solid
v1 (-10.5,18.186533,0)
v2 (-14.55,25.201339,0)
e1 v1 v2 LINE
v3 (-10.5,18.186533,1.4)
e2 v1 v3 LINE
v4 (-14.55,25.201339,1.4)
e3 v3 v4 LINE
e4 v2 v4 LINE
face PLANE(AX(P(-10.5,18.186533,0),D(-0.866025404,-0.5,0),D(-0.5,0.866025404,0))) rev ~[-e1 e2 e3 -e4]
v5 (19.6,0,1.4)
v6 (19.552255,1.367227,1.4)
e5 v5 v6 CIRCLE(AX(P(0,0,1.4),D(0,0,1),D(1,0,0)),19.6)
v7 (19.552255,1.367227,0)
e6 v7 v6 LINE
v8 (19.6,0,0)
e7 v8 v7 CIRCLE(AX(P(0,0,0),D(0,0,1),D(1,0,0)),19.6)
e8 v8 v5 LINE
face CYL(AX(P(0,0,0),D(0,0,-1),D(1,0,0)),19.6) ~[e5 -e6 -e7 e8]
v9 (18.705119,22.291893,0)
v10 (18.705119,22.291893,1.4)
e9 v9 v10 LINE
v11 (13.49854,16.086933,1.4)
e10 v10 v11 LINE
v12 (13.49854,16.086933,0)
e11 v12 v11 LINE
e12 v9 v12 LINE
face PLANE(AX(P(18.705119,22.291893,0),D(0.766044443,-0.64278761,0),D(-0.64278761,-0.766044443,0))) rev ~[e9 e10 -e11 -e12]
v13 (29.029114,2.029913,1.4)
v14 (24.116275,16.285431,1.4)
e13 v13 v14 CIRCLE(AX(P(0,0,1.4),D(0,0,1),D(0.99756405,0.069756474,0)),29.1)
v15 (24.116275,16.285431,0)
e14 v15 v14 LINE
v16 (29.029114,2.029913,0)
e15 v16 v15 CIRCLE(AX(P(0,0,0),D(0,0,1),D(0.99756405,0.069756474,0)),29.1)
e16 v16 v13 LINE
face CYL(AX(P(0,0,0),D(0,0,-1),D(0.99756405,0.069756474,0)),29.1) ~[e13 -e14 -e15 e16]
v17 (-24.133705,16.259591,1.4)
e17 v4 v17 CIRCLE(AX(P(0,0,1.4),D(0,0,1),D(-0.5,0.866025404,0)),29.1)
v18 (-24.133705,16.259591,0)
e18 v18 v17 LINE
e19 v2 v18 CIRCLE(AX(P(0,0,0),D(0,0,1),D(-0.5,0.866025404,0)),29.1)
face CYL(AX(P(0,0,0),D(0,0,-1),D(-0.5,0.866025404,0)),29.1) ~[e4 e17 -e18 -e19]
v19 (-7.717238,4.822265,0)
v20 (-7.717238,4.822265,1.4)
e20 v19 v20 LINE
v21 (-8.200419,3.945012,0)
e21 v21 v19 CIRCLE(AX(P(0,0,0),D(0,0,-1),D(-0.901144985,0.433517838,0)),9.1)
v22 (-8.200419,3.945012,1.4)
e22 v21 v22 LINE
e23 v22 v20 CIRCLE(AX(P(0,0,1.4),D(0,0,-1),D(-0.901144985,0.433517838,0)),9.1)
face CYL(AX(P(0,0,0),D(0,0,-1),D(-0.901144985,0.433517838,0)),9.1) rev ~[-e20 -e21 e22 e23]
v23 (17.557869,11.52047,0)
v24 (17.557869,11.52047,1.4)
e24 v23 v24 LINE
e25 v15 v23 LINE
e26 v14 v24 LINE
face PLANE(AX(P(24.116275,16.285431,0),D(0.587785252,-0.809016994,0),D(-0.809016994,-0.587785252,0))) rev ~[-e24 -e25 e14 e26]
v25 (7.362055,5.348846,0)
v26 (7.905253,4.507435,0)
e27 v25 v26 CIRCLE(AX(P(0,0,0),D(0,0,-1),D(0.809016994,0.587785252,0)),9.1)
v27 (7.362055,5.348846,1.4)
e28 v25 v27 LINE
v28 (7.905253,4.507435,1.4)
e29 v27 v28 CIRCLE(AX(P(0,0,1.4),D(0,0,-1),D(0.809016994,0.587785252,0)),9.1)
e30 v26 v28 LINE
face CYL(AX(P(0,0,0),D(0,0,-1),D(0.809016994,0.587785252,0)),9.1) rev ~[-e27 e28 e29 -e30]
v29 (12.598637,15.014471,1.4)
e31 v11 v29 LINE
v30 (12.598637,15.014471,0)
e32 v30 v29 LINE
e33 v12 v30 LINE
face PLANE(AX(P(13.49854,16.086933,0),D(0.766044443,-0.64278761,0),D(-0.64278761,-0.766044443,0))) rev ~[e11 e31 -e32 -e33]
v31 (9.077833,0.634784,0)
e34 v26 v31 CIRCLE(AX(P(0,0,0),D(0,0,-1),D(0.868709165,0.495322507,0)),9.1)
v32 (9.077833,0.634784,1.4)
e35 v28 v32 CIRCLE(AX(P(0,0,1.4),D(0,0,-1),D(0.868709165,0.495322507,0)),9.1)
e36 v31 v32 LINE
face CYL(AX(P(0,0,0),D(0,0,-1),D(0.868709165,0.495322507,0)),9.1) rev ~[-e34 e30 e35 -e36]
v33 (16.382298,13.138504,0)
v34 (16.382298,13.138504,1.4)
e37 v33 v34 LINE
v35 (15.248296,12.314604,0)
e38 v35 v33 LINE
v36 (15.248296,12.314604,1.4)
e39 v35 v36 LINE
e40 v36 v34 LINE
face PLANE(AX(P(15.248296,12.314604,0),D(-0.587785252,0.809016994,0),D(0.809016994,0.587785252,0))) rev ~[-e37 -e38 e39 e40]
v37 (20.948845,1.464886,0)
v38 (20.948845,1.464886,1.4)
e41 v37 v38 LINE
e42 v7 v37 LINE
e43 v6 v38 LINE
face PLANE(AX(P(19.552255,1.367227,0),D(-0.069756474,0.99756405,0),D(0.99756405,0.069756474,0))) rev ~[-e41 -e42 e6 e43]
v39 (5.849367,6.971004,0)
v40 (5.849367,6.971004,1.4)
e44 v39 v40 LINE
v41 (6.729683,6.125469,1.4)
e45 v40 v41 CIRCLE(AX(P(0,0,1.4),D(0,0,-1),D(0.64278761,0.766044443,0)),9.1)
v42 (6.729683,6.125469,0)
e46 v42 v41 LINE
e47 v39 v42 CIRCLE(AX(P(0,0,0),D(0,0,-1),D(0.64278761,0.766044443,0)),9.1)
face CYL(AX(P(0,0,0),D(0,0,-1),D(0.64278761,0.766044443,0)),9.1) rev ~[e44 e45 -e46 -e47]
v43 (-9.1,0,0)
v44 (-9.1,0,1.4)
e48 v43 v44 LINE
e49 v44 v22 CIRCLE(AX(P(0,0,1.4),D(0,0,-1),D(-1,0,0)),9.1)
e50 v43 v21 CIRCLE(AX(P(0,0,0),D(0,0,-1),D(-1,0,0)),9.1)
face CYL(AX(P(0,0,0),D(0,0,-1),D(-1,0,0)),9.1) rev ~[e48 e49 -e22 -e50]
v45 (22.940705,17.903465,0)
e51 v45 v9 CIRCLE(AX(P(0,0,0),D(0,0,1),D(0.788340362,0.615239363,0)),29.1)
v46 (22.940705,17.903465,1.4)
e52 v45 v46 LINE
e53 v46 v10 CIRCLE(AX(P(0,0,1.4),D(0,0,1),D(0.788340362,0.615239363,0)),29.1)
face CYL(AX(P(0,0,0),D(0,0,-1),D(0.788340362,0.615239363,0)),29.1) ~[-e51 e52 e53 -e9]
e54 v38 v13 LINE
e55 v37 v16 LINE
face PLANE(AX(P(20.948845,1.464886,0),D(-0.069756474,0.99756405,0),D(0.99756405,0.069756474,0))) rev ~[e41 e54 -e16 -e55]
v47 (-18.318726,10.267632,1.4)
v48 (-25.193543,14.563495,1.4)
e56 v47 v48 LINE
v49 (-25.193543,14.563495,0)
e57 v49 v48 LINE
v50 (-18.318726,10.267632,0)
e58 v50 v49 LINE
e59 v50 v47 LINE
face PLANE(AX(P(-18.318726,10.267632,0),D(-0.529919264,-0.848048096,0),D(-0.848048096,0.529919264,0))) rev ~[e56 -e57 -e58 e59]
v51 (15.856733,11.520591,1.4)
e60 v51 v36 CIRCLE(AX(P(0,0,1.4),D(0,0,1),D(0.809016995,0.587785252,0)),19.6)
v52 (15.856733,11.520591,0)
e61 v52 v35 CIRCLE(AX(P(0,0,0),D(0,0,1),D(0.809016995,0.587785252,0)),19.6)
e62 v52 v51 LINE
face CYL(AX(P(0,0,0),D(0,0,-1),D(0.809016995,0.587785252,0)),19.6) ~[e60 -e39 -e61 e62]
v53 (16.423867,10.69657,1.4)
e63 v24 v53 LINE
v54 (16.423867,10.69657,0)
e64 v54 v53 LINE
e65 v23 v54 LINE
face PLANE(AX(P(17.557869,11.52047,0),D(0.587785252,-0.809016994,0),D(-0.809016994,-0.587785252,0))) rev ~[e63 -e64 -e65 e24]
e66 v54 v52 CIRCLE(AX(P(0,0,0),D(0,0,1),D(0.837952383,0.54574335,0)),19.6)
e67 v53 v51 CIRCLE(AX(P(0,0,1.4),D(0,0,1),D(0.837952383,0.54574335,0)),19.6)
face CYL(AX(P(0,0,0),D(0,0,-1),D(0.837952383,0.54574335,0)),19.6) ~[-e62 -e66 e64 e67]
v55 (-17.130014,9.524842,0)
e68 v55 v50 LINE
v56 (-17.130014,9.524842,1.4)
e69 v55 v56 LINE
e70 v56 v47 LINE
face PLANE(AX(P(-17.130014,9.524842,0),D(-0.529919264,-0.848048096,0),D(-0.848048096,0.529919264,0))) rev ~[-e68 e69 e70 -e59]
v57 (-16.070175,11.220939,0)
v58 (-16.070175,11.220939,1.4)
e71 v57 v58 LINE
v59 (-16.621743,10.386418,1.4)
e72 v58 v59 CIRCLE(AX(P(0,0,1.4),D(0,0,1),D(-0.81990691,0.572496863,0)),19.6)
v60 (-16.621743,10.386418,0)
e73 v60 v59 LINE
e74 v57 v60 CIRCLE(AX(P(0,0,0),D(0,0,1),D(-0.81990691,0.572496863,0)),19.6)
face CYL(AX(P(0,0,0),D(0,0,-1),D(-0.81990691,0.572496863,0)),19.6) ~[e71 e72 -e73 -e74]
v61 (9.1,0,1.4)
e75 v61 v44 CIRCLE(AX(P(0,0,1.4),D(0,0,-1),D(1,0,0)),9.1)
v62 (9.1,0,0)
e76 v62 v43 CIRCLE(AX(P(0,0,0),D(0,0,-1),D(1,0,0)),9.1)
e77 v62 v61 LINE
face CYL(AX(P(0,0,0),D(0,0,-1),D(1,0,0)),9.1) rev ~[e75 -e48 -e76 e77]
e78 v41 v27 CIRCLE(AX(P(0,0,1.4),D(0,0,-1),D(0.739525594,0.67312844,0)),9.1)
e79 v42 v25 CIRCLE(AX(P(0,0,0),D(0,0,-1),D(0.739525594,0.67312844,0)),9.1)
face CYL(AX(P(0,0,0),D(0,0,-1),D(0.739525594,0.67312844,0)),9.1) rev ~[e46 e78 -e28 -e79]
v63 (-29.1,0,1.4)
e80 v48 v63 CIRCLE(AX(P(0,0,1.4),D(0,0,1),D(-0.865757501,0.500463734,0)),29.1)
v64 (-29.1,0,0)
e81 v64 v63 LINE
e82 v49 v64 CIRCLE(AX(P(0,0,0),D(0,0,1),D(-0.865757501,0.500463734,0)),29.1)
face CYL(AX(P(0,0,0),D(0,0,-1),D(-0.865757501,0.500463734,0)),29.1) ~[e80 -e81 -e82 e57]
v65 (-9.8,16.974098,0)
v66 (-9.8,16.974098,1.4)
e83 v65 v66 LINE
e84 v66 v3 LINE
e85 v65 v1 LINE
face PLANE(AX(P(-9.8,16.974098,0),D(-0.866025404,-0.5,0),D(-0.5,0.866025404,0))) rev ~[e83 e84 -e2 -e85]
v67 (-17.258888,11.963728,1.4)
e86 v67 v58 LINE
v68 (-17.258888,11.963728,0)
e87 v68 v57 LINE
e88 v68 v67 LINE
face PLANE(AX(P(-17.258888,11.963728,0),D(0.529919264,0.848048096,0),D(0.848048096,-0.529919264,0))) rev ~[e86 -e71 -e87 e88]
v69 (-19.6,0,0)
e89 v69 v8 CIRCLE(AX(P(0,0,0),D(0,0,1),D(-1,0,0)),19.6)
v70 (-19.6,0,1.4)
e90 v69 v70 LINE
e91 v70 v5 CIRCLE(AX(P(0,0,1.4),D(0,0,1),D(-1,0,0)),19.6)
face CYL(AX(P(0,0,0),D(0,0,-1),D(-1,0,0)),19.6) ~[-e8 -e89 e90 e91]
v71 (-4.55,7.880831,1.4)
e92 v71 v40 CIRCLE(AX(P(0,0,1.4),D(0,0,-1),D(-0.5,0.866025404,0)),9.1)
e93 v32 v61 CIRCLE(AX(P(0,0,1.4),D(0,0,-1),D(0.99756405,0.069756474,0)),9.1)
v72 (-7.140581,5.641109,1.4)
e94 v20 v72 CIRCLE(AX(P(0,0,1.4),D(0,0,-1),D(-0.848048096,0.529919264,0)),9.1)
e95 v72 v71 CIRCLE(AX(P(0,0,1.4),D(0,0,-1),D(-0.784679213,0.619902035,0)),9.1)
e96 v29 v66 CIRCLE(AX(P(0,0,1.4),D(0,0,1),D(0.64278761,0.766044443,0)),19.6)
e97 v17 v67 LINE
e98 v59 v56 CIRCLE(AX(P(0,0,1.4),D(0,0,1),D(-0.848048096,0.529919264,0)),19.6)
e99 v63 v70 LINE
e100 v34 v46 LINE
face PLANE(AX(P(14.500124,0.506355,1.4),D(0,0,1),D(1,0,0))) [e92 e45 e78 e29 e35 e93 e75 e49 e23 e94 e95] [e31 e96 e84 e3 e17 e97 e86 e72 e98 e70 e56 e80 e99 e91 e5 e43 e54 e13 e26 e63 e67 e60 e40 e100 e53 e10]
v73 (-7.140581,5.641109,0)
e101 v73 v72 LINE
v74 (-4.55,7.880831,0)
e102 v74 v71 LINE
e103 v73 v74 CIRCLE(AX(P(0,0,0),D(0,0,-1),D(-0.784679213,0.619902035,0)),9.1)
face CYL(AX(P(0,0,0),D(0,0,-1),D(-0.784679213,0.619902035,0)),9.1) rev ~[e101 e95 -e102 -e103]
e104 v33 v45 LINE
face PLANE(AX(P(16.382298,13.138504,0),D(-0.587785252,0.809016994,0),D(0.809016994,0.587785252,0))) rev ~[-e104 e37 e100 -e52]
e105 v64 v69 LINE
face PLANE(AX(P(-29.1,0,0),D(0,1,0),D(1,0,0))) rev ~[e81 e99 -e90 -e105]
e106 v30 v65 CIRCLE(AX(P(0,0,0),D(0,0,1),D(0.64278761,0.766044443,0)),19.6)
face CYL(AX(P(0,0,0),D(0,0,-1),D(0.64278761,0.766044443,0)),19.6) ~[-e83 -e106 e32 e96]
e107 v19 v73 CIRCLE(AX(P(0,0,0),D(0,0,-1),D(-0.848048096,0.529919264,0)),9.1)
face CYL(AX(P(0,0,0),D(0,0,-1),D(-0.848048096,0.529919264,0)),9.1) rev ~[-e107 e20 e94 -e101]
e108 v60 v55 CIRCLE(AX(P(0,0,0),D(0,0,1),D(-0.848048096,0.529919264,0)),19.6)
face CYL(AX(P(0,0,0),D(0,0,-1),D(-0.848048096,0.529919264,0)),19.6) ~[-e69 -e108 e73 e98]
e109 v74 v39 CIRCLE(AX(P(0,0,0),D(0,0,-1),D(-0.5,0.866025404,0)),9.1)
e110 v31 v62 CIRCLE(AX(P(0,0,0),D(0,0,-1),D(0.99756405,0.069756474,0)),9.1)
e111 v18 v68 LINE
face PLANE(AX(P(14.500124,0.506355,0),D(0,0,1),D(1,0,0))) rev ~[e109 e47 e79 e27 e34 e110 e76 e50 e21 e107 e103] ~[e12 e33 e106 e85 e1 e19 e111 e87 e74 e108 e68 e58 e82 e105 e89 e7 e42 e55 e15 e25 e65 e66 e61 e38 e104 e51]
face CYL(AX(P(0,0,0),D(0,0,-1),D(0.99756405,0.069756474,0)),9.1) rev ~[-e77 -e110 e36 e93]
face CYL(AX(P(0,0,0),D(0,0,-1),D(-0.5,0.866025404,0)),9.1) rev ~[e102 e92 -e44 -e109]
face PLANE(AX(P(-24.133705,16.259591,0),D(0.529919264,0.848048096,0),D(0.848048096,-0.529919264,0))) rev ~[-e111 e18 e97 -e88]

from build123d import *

# Parameters (mm, degrees)
F1_DEPTH = 1.4


# Not quite as in the source:
# - a feature names something its author has since deleted; it is built from what else it names


with BuildPart() as f1:
    # F0 (on Top) → F1 (new body)
    with BuildSketch(Plane.XY):
        with BuildLine():
            Line((9.1, 0), (19.6, 0))
            ThreePointArc((19.6, 0), (19.5880602096, 0.6840301354), (19.5522553851, 1.3672268854))
            Line((19.5522553851, 1.3672268854), (9.0778328574, 0.6347839111))
            ThreePointArc((9.0778328574, 0.6347839111), (9.0944565259, 0.31758542), (9.1, 0))
        make_face()
        with BuildLine():
            ThreePointArc((-19.6, 0), (0, -19.6), (19.6, 0))
            Line((19.6, 0), (9.1, 0))
            ThreePointArc((9.1, 0), (0, -9.1), (-9.1, 0))
            Line((-9.1, 0), (-19.6, 0))
        make_face()
        with BuildLine():
            Line((9.0778328574, 0.6347839111), (19.5522553851, 1.3672268854))
            ThreePointArc((19.5522553851, 1.3672268854), (18.5830433274, 6.2314124156), (16.4238667052, 10.6965696581))
            Line((16.4238667052, 10.6965696581), (7.9052534042, 4.5074348153))
            ThreePointArc((7.9052534042, 4.5074348153), (8.7095155433, 2.6371080753), (9.0778328574, 0.6347839111))
        make_face()
        with BuildLine():
            ThreePointArc((16.4238667052, 10.6965696581), (18.5830433274, 6.2314124156), (19.5522553851, 1.3672268854))
            Line((19.5522553851, 1.3672268854), (20.9488450555, 1.4648859486))
            ThreePointArc((20.9488450555, 1.4648859486), (19.8990062518, 6.7104061122), (17.5578688927, 11.5204704742))
            Line((17.5578688927, 11.5204704742), (16.4238667052, 10.6965696581))
        make_face()
        with BuildLine():
            Line((-21, 0), (-19.6, 0))
            ThreePointArc((-19.6, 0), (-18.9724573243, 4.9199454342), (-17.1300139719, 9.5248423254))
            Line((-17.1300139719, 9.5248423254), (-18.3187262027, 10.2676321667))
            ThreePointArc((-18.3187262027, 10.2676321667), (-20.3186275405, 5.3059753931), (-21, 0))
        make_face()
        with BuildLine():
            ThreePointArc((-17.1300139719, 9.5248423254), (-18.9724573243, 4.9199454342), (-19.6, 0))
            Line((-19.6, 0), (-9.1, 0))
            ThreePointArc((-9.1, 0), (-8.8722549614, 2.0231391203), (-8.2004193626, 3.9450123291))
            Line((-8.2004193626, 3.9450123291), (-17.1300139719, 9.5248423254))
        make_face()
        with BuildLine():
            Line((7.9052534042, 4.5074348153), (16.4238667052, 10.6965696581))
            ThreePointArc((16.4238667052, 10.6965696581), (16.1455577033, 11.1121989925), (15.8567330897, 11.5205909449))
            Line((15.8567330897, 11.5205909449), (7.3620546488, 5.3488457959))
            ThreePointArc((7.3620546488, 5.3488457959), (7.6452381851, 4.9356188157), (7.9052534042, 4.5074348153))
        make_face()
        with BuildLine():
            ThreePointArc((17.5578688927, 11.5204704742), (19.8990062518, 6.7104061122), (20.9488450555, 1.4648859486))
            Line((20.9488450555, 1.4648859486), (29.0291138626, 2.029913386))
            ThreePointArc((29.0291138626, 2.029913386), (27.512052622, 9.481400768), (24.1162750467, 16.285431461))
            Line((24.1162750467, 16.285431461), (17.5578688927, 11.5204704742))
        make_face()
        with BuildLine():
            ThreePointArc((-16.6217426847, 10.386417579), (-16.8813757535, 9.9588730623), (-17.1300139719, 9.5248423254))
            Line((-17.1300139719, 9.5248423254), (-8.2004193626, 3.9450123291))
            ThreePointArc((-8.2004193626, 3.9450123291), (-7.9709061334, 4.3902910396), (-7.717237675, 4.8222653045))
            Line((-7.717237675, 4.8222653045), (-16.6217426847, 10.386417579))
        make_face()
        with BuildLine():
            Line((-29.1, 0), (-21, 0))
            ThreePointArc((-21, 0), (-20.3186275405, 5.3059753931), (-18.3187262027, 10.2676321667))
            Line((-18.3187262027, 10.2676321667), (-25.1935432849, 14.5634946614))
            ThreePointArc((-25.1935432849, 14.5634946614), (-28.1064237283, 7.5391607759), (-29.1, 0))
        make_face()
        with BuildLine():
            Line((7.3620546488, 5.3488457959), (15.8567330897, 11.5205909449))
            ThreePointArc((15.8567330897, 11.5205909449), (15.5575809762, 11.9214795294), (15.2482962006, 12.3146036469))
            Line((15.2482962006, 12.3146036469), (6.7296828997, 6.1254688041))
            ThreePointArc((6.7296828997, 6.1254688041), (7.0565609618, 5.7458635027), (7.3620546488, 5.3488457959))
        make_face()
        with BuildLine():
            ThreePointArc((-16.0701754434, 11.2209385177), (-16.3512838646, 10.8071974155), (-16.6217426847, 10.386417579))
            Line((-16.6217426847, 10.386417579), (-7.717237675, 4.8222653045))
            ThreePointArc((-7.717237675, 4.8222653045), (-7.4401827106, 5.2396260586), (-7.1405808342, 5.6411085215))
            Line((-7.1405808342, 5.6411085215), (-16.0701754434, 11.2209385177))
        make_face()
        with BuildLine():
            Line((6.7296828997, 6.1254688041), (15.2482962006, 12.3146036469))
            ThreePointArc((15.2482962006, 12.3146036469), (13.9887542441, 13.7286108073), (12.5986371499, 15.0144710851))
            Line((12.5986371499, 15.0144710851), (5.8493672481, 6.9710044324))
            ThreePointArc((5.8493672481, 6.9710044324), (6.3037178141, 6.5630131586), (6.7296828997, 6.1254688041))
        make_face()
        with BuildLine():
            ThreePointArc((12.5986371499, 15.0144710851), (13.9887542441, 13.7286108073), (15.2482962006, 12.3146036469))
            Line((15.2482962006, 12.3146036469), (16.3822983881, 13.1385044629))
            ThreePointArc((16.3822983881, 13.1385044629), (15.0129754185, 14.6836837709), (13.4985398034, 16.0869333055))
            Line((13.4985398034, 16.0869333055), (12.5986371499, 15.0144710851))
        make_face()
        with BuildLine():
            Line((-17.2588876742, 11.963728359), (-16.0701754434, 11.2209385177))
            ThreePointArc((-16.0701754434, 11.2209385177), (-13.2510831681, 14.4419110533), (-9.8, 16.9740979142))
            Line((-9.8, 16.9740979142), (-10.5, 18.1865334795))
            ThreePointArc((-10.5, 18.1865334795), (-14.2239160262, 15.4492787172), (-17.2588876742, 11.963728359))
        make_face()
        with BuildLine():
            ThreePointArc((-9.8, 16.9740979142), (-13.2510831681, 14.4419110533), (-16.0701754434, 11.2209385177))
            Line((-16.0701754434, 11.2209385177), (-7.1405808342, 5.6411085215))
            ThreePointArc((-7.1405808342, 5.6411085215), (-5.9515972184, 6.8839298769), (-4.55, 7.8808311744))
            Line((-4.55, 7.8808311744), (-9.8, 16.9740979142))
        make_face()
        with BuildLine():
            Line((5.8493672481, 6.9710044324), (12.5986371499, 15.0144710851))
            ThreePointArc((12.5986371499, 15.0144710851), (1.7082525579, 19.5254160826), (-9.8, 16.9740979142))
            Line((-9.8, 16.9740979142), (-4.55, 7.8808311744))
            ThreePointArc((-4.55, 7.8808311744), (0.793117259, 9.0653717526), (5.8493672481, 6.9710044324))
        make_face()
        with BuildLine():
            ThreePointArc((13.4985398034, 16.0869333055), (15.0129754185, 14.6836837709), (16.3822983881, 13.1385044629))
            Line((16.3822983881, 13.1385044629), (22.9407045421, 17.9034654498))
            ThreePointArc((22.9407045421, 17.9034654498), (20.9382004615, 20.2089525071), (18.7051194419, 22.2918932948))
            Line((18.7051194419, 22.2918932948), (13.4985398034, 16.0869333055))
        make_face()
        with BuildLine():
            Line((-24.1337047564, 16.2595908537), (-17.2588876742, 11.963728359))
            ThreePointArc((-17.2588876742, 11.963728359), (-14.2239160262, 15.4492787172), (-10.5, 18.1865334795))
            Line((-10.5, 18.1865334795), (-14.55, 25.2013392501))
            ThreePointArc((-14.55, 25.2013392501), (-19.8518505313, 21.2770775832), (-24.1337047564, 16.2595908537))
        make_face()
    extrude(amount=F1_DEPTH)


solid = f1.part
